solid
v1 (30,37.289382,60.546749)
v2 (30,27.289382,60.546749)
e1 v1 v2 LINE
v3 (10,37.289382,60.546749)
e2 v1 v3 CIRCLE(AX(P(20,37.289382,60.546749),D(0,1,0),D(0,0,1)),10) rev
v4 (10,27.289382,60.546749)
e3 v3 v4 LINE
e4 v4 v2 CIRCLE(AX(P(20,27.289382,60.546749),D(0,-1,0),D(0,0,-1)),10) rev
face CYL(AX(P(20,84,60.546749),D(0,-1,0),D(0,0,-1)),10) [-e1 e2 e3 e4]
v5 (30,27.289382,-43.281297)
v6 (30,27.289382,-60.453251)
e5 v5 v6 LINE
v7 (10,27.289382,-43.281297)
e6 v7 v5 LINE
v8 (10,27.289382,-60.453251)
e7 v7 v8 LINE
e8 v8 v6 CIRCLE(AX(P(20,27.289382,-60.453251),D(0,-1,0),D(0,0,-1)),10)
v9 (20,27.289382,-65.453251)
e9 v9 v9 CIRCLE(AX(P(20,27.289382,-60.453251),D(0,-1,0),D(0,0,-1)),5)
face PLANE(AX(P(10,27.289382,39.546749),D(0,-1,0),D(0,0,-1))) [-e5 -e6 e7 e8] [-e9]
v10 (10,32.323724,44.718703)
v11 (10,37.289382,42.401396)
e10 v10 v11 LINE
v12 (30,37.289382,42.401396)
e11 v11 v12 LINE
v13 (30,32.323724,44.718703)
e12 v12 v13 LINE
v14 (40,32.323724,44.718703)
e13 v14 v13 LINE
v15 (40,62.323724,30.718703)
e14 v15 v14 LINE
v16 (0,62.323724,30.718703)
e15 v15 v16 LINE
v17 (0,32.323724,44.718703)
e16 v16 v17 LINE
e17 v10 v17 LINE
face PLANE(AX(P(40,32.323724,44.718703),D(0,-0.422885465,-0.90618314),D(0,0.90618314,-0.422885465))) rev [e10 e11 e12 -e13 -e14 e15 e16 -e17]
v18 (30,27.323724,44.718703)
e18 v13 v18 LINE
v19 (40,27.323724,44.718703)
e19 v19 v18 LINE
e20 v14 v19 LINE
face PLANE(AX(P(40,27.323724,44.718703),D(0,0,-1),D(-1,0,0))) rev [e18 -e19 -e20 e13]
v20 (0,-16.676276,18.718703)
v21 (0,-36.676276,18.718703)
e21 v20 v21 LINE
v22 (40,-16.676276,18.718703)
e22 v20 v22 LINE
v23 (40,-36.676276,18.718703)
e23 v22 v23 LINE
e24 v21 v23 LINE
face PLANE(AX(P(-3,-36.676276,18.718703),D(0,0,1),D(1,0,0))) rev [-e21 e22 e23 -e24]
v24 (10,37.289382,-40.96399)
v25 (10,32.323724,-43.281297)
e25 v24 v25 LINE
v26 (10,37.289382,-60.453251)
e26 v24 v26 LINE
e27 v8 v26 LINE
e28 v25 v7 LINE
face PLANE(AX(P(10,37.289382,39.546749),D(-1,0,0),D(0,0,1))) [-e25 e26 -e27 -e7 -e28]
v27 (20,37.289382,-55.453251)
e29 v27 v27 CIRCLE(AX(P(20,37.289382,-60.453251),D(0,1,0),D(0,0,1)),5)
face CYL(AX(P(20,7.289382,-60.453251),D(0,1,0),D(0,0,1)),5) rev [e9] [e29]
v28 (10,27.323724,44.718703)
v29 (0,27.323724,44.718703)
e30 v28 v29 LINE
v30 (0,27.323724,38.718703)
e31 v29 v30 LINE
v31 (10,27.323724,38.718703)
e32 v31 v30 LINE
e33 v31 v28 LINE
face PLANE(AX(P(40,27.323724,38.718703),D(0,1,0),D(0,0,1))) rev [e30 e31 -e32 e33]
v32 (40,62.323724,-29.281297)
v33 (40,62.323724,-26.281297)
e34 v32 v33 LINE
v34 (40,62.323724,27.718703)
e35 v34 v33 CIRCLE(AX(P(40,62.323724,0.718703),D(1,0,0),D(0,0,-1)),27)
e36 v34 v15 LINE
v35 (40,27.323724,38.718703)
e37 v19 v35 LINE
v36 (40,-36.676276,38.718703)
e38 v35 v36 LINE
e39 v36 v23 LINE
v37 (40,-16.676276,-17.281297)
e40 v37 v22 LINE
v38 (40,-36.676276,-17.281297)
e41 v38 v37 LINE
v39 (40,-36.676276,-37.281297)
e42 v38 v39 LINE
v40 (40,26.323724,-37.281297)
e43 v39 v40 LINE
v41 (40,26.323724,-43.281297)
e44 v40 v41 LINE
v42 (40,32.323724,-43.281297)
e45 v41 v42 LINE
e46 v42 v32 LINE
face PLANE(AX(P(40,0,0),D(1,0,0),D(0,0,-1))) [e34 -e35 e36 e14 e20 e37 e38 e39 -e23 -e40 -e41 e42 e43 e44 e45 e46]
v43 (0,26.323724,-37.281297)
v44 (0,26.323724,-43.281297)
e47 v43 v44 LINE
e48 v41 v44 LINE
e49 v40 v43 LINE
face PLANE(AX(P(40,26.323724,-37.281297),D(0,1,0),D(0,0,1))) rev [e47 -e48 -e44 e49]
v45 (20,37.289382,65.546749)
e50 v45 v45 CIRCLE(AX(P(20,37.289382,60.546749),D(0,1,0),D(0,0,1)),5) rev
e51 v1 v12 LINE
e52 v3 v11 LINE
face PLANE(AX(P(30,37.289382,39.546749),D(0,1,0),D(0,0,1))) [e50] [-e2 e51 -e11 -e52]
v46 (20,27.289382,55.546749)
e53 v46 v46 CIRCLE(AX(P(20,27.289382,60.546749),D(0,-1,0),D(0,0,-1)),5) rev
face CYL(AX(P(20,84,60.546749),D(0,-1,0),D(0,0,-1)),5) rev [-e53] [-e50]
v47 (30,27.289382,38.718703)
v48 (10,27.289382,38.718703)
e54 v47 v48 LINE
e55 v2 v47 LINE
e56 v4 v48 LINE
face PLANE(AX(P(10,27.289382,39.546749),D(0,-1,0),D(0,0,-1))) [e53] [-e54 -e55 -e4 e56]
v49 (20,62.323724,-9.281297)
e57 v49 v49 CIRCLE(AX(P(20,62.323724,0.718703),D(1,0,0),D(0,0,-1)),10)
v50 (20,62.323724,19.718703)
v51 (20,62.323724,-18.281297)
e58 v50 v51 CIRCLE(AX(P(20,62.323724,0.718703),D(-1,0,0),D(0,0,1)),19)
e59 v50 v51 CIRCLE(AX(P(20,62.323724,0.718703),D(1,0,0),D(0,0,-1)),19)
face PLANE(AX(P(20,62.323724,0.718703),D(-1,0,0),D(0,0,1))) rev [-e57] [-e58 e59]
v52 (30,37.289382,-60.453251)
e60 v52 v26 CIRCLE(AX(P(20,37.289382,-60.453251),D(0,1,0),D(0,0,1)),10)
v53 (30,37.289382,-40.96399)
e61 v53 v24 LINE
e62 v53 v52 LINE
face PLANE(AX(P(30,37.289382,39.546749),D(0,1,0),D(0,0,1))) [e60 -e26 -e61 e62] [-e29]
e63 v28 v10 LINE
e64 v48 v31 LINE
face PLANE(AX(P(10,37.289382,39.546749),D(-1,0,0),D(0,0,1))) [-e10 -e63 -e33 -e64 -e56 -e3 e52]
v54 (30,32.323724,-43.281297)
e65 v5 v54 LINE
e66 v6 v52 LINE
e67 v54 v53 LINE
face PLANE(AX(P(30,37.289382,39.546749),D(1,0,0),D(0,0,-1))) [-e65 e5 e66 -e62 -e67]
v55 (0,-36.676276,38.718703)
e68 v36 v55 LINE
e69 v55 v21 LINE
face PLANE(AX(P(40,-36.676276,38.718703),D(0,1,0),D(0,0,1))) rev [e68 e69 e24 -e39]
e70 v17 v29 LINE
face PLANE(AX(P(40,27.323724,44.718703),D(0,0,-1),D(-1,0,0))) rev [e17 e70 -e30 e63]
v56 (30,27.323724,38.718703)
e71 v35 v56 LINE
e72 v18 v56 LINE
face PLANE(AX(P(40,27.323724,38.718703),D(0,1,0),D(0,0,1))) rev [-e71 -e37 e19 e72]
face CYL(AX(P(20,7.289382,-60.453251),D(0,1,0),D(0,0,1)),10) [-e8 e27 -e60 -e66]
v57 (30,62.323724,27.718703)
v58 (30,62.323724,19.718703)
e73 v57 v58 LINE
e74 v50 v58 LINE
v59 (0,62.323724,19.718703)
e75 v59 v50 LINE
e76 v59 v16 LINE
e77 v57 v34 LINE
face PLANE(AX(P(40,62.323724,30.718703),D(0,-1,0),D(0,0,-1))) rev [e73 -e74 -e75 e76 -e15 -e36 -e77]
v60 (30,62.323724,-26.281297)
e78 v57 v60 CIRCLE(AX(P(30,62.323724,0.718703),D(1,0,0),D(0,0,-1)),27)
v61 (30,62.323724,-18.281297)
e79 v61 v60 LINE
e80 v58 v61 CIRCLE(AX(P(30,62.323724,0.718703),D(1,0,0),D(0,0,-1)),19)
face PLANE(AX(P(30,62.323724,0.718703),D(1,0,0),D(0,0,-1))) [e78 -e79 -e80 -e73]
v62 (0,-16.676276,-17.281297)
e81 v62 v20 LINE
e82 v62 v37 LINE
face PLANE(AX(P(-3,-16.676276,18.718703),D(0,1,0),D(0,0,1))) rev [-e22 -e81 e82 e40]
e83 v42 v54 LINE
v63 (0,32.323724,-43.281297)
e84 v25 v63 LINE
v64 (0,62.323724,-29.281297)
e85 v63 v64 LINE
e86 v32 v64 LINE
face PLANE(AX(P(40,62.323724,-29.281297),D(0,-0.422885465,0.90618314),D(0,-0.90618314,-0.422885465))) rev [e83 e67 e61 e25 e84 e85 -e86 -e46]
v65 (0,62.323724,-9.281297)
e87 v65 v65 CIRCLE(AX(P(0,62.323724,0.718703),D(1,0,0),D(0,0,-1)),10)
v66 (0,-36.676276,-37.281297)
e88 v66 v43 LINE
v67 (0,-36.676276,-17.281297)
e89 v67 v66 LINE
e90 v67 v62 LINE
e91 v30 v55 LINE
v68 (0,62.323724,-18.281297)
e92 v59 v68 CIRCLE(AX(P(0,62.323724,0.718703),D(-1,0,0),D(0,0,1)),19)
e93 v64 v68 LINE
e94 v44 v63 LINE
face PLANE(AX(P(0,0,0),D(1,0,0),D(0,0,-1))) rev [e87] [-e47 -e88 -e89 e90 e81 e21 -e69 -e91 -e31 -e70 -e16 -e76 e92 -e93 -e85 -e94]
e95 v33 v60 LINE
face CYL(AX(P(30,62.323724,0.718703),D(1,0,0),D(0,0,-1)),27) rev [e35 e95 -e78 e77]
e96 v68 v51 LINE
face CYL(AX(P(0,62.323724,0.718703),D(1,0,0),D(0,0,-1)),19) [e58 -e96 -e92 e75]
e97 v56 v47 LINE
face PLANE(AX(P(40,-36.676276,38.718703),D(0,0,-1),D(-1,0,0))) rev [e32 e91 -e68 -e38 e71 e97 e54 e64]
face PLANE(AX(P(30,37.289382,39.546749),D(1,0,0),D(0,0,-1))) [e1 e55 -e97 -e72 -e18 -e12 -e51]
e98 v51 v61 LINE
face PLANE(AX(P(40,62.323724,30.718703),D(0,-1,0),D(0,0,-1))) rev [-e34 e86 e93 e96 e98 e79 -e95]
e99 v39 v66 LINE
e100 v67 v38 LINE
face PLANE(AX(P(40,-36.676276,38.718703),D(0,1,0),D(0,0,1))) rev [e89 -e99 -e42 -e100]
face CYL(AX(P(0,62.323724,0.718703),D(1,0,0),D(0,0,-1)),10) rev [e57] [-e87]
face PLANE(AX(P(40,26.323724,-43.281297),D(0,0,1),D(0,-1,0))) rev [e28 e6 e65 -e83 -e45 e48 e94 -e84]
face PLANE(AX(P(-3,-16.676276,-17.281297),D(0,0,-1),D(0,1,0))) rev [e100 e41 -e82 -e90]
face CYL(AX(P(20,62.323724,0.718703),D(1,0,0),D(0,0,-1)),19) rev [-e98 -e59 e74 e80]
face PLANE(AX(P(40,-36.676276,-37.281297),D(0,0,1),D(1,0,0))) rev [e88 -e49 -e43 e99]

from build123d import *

# Parameters (mm, degrees)
BOSS_EXTRUDE1_DEPTH      = 40
BOSS_EXTRUDE2_DEPTH      = 110
BOSS_EXTRUDE2_DEPTH_BACK = 31
SKETCH11_R               = 5
CUT_EXTRUDE11_DEPTH      = 30
SKETCH12_R               = 5
CUT_EXTRUDE15_DEPTH      = 84
SKETCH5_W                = 36
SKETCH5_H                = 20
CUT_EXTRUDE3_DEPTH       = 43
BOSS_EXTRUDE6_DEPTH      = 40
CUT_EXTRUDE4_START       = -10
SKETCH6_R                = 27
CUT_EXTRUDE4_DEPTH       = 10
CUT_EXTRUDE7_START       = -10
CUT_EXTRUDE7_DEPTH       = 10
CUT_EXTRUDE8_START       = -20
CUT_EXTRUDE8_DEPTH       = 20
SKETCH10_R               = 10
CUT_EXTRUDE9_DEPTH       = 20


# Read off the part's stored shape, not the designer's step: Boss-Extrude6
with BuildPart() as part:
    # Sketch1 → Boss-Extrude1 (new body)
    with BuildSketch(Plane(origin=(0, 0, 0), x_dir=(0, 0, -1), z_dir=(1, 0, 0))):
        Polygon((-38.7187028, -36.676276186), (37.2812972, -36.676276186), (37.2812972, 26.323723814), (43.2812972, 26.323723814), (43.2812972, 32.323723814), (29.2812972, 62.323723814), (-30.7187028, 62.323723814), (-44.7187028, 32.323723814), (-44.7187028, 27.323723814), (-38.7187028, 27.323723814), align=None)
    extrude(amount=BOSS_EXTRUDE1_DEPTH)

    # 3DSketch1 → Boss-Extrude2 (add, two sides: drawn at the far end of the back side and taken through both)
    with BuildSketch(Plane(origin=(30, 37.289381844, 39.546748703), x_dir=(-0.8944271909999159, -0.44721359549995804, 0), z_dir=(0, 0, -1)).offset(-BOSS_EXTRUDE2_DEPTH_BACK)):
        Polygon((0, 0), (17.88854382, 8.94427191), (22.360679775, 0), (4.472135955, -8.94427191), align=None)
    extrude(amount=BOSS_EXTRUDE2_DEPTH + BOSS_EXTRUDE2_DEPTH_BACK)

    # Sketch11 → Cut-Extrude11 (cut)
    with BuildSketch(Plane(origin=(0, 37.289381844, 0), x_dir=(1, 0, 0), z_dir=(0, 1, 0))):
        with BuildLine():
            Line((20, 70.453251297), (10, 70.453251297))
            Line((10, 70.453251297), (10, 60.453251297))
            ThreePointArc((10, 60.453251297), (12.928932188, 67.524319109), (20, 70.453251297))
        make_face()
        with BuildLine():
            Line((30, 70.453251297), (20, 70.453251297))
            ThreePointArc((20, 70.453251297), (27.071067812, 67.524319109), (30, 60.453251297))
            Line((30, 60.453251297), (30, 70.453251297))
        make_face()
        with Locations(Location((20, 60.453251297, 0), (0, 0, 270))):
            Circle(SKETCH11_R)
    extrude(amount=-CUT_EXTRUDE11_DEPTH, mode=Mode.SUBTRACT)

    # Sketch12 → Cut-Extrude15 (cut)
    with BuildSketch(Plane(origin=(0, 0, 0), x_dir=(1, 0, 0), z_dir=(0, 1, 0))):
        with BuildLine():
            Line((10, -70.546748703), (20, -70.546748703))
            ThreePointArc((20, -70.546748703), (12.928932188, -67.617816515), (10, -60.546748703))
            Line((10, -60.546748703), (10, -70.546748703))
        make_face()
        with BuildLine():
            Line((20, -70.546748703), (30, -70.546748703))
            Line((30, -70.546748703), (30, -60.546748703))
            ThreePointArc((30, -60.546748703), (27.071067812, -67.617816515), (20, -70.546748703))
        make_face()
        with Locations(Location((20, -60.546748703, 0), (0, 0, 90))):
            Circle(SKETCH12_R)
    extrude(amount=CUT_EXTRUDE15_DEPTH, mode=Mode.SUBTRACT)

    # Sketch5 → Cut-Extrude3 (cut)
    with BuildSketch(Plane(origin=(40, 0, 0), x_dir=(0, 0, -1), z_dir=(1, 0, 0))):
        with Locations((-0.7187028, -26.676276186)):
            Rectangle(SKETCH5_W, SKETCH5_H)
    extrude(amount=-CUT_EXTRUDE3_DEPTH, mode=Mode.SUBTRACT)

    # Boss-Extrude6 outline → Boss-Extrude6 (add)
    with BuildSketch(Plane.YZ):
        with BuildLine():
            ThreePointArc((62.323723814, -26.2812972), (89.323723814, 0.7187028), (62.323723814, 27.7187028))
            Line((62.323723814, 27.7187028), (62.323723814, -26.2812972))
        make_face()
    extrude(amount=BOSS_EXTRUDE6_DEPTH)

    # Sketch6 → Cut-Extrude4 (cut)
    with BuildSketch(Plane(origin=(40, 0, 0), x_dir=(0, 0, -1), z_dir=(1, 0, 0)).offset(CUT_EXTRUDE4_START)):
        with Locations((-0.7187028, 62.323723814)):
            Circle(SKETCH6_R)
    extrude(amount=CUT_EXTRUDE4_DEPTH, mode=Mode.SUBTRACT)

    # Sketch8 → Cut-Extrude7 (cut)
    with BuildSketch(Plane(origin=(30, 0, 0), x_dir=(0, 0, -1), z_dir=(1, 0, 0)).offset(CUT_EXTRUDE7_START)):
        with BuildLine():
            Line((-27.7187028, 62.323723814), (-19.7187028, 62.323723814))
            ThreePointArc((-19.7187028, 62.323723814), (-0.7187028, 43.323723814), (18.2812972, 62.323723814))
            Line((18.2812972, 62.323723814), (26.2812972, 62.323723814))
            ThreePointArc((26.2812972, 62.323723814), (-0.7187028, 89.323723814), (-27.7187028, 62.323723814))
        make_face()
    extrude(amount=CUT_EXTRUDE7_DEPTH, mode=Mode.SUBTRACT)

    # Sketch9 → Cut-Extrude8 (cut)
    with BuildSketch(Plane(origin=(20, 0, 0), x_dir=(0, 0, -1), z_dir=(1, 0, 0)).offset(CUT_EXTRUDE8_START)):
        with BuildLine():
            Line((-27.7187028, 62.323723814), (-19.7187028, 62.323723814))
            ThreePointArc((-19.7187028, 62.323723814), (-0.7187028, 81.323723814), (18.2812972, 62.323723814))
            Line((18.2812972, 62.323723814), (26.2812972, 62.323723814))
            ThreePointArc((26.2812972, 62.323723814), (-0.7187028, 89.323723814), (-27.7187028, 62.323723814))
        make_face()
    extrude(amount=CUT_EXTRUDE8_DEPTH, mode=Mode.SUBTRACT)

    # Sketch10 → Cut-Extrude9 (cut)
    with BuildSketch(Plane(origin=(20, 0, 0), x_dir=(0, 0, -1), z_dir=(1, 0, 0))):
        with Locations((-0.7187028, 62.323723814)):
            Circle(SKETCH10_R)
    extrude(amount=-CUT_EXTRUDE9_DEPTH, mode=Mode.SUBTRACT)


solid = part.part
